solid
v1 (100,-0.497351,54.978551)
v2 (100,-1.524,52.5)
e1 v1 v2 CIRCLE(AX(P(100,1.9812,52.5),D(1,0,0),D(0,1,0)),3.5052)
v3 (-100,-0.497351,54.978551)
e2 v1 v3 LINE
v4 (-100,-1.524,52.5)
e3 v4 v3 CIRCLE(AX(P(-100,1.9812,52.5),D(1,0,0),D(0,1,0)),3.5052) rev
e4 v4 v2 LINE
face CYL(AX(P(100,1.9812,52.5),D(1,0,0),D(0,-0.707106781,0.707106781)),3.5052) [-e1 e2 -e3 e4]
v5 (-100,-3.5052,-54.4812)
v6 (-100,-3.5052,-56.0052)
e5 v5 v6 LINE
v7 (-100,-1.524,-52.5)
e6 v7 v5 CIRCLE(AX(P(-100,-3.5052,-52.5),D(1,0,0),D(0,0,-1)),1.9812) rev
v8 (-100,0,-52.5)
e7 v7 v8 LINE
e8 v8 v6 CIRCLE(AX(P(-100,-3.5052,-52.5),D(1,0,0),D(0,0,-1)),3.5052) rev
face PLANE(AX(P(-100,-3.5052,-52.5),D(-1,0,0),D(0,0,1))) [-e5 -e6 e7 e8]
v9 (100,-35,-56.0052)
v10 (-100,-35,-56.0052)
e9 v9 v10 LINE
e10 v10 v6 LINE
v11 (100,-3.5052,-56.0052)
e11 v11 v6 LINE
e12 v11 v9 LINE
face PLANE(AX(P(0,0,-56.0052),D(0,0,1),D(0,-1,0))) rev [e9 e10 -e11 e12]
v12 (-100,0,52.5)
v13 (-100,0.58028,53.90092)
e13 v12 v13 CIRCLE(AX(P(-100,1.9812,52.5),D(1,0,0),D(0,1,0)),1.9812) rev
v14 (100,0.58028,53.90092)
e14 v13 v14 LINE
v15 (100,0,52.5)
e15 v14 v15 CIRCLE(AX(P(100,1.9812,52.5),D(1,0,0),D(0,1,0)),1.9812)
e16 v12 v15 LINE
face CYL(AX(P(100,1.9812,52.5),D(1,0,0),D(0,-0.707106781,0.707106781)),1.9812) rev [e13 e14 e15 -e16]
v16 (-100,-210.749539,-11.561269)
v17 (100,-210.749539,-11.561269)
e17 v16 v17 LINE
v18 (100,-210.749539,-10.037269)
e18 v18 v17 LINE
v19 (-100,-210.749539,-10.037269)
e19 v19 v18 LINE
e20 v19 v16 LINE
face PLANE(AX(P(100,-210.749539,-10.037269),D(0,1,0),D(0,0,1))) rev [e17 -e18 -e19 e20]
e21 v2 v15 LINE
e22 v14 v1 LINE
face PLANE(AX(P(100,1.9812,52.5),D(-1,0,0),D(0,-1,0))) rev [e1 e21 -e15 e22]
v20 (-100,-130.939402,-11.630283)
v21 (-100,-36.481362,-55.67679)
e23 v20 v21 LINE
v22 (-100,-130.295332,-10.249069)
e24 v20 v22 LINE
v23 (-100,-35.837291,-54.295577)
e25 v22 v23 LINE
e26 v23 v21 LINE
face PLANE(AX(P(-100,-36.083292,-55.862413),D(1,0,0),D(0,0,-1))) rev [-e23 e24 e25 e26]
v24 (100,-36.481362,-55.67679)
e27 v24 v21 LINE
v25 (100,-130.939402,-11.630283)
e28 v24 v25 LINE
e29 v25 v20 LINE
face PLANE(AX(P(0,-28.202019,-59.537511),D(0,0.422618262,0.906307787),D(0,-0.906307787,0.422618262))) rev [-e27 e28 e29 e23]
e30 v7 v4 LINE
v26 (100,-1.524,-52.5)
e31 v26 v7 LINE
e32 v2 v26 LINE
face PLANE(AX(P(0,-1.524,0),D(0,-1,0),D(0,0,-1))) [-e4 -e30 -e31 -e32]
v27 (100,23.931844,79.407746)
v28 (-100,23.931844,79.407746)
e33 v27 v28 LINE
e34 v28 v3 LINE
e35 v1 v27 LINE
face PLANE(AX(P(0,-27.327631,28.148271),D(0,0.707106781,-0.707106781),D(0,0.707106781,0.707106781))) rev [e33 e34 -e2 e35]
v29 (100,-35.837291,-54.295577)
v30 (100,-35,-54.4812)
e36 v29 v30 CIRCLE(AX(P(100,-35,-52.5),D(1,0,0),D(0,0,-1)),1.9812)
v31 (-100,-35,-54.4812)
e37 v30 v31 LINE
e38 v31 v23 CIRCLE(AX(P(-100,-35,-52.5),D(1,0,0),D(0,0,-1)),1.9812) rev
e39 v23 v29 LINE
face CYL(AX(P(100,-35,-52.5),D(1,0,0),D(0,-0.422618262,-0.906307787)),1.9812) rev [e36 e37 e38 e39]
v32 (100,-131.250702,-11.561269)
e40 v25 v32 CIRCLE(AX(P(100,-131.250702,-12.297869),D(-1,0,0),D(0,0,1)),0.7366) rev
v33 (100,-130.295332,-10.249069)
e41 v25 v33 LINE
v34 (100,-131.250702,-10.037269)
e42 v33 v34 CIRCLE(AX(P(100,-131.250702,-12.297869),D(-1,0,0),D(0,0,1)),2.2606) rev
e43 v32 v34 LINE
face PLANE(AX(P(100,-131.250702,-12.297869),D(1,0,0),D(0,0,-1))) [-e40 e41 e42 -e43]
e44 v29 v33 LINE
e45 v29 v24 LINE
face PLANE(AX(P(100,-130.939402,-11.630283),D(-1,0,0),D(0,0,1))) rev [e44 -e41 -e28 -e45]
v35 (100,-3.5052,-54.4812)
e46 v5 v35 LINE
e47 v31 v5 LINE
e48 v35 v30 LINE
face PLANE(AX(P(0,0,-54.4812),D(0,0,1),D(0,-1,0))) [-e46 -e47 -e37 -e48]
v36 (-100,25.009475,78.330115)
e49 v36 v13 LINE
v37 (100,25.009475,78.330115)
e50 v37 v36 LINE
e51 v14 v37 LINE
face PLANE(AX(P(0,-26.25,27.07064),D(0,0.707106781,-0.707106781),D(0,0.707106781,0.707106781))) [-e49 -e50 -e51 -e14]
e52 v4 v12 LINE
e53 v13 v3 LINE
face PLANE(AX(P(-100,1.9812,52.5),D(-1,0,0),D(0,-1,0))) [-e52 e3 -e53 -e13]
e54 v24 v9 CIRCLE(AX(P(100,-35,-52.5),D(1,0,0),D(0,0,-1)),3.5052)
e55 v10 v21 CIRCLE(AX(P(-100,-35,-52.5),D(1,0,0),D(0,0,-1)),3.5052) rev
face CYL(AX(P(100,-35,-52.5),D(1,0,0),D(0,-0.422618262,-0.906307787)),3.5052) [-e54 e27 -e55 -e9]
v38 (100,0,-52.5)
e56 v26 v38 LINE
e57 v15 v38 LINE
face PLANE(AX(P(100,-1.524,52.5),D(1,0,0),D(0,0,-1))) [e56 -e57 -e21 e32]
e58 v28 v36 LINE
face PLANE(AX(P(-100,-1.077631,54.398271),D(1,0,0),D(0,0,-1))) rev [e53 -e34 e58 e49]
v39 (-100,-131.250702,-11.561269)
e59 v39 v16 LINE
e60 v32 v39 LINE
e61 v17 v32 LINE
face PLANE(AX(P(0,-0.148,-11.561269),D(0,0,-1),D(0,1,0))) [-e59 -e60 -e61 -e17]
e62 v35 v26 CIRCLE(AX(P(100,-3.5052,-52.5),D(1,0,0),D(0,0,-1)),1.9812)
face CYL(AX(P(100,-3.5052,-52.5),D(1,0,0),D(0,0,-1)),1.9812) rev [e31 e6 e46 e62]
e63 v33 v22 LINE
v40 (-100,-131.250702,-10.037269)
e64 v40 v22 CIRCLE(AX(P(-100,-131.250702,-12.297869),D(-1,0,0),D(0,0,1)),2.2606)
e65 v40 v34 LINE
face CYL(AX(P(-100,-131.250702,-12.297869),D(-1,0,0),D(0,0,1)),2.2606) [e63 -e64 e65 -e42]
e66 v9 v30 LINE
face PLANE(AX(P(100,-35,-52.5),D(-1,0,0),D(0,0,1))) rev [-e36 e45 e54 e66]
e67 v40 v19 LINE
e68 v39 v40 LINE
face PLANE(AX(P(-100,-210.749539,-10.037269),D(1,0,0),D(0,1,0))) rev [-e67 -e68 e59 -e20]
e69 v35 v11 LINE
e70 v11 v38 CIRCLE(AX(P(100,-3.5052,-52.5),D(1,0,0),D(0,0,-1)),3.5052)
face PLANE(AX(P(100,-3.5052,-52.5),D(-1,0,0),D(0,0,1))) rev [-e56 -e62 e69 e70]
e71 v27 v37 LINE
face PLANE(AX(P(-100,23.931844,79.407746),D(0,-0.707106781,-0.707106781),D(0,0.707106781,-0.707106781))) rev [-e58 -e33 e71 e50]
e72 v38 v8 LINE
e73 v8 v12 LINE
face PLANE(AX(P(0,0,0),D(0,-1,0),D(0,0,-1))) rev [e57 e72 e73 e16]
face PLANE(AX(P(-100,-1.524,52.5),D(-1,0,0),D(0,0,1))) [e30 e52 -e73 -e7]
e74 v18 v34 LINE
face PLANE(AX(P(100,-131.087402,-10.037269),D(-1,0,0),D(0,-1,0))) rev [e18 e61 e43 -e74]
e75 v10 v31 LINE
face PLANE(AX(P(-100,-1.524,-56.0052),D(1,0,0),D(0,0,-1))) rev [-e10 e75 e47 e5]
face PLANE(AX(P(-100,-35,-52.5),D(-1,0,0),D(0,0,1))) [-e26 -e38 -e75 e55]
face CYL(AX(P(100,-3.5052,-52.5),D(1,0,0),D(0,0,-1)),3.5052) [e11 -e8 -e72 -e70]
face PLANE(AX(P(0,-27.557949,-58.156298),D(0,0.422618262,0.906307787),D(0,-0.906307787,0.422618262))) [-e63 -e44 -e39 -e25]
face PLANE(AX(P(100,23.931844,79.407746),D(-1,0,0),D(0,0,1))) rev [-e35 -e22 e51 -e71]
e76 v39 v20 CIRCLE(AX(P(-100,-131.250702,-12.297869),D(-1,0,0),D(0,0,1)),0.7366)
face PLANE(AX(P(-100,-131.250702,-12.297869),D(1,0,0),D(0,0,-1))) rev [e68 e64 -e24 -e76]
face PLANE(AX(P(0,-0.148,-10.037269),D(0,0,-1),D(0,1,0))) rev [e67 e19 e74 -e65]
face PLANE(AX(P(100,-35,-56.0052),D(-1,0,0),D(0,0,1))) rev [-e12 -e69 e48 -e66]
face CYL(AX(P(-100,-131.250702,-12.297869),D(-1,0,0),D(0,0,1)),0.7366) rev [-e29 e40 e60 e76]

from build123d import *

# Parameters (mm, degrees)
SKETCH1_W          = 200
SKETCH1_H          = 105
BASE_FLANGE1_DEPTH = 1.524
EDGE_FLANGE1_DEPTH = 200
EDGE_FLANGE2_DEPTH = 200
EDGE_FLANGE3_DEPTH = 200
EDGE_FLANGE4_DEPTH = 200


# Sheet-metal steps are written as plain solids
with BuildPart() as part:
    # Sketch1 → Base-Flange1 (new body)
    with BuildSketch(Plane(origin=(0, 0, 0), x_dir=(1, 0, 0), z_dir=(0, 1, 0))):
        Rectangle(SKETCH1_W, SKETCH1_H)
    extrude(amount=-BASE_FLANGE1_DEPTH)

    # Edge-Flange1 section (across the edge) → Edge-Flange1 (add)
    with BuildSketch(Plane(origin=(-100, 0, 53.32063991), x_dir=(0, 0.7071067811865512, -0.7071067811865438), z_dir=(1, 0, 0))):
        with BuildLine():
            Line((-1.524, 0.82063991), (-1.524, 35.368738531))
            Line((-1.524, 35.368738531), (0, 35.368738531))
            Line((0, 35.368738531), (0, 0.82063991))
            ThreePointArc((0, 0.82063991), (0.15080987, 0.062467494), (0.580280045, -0.580280045))
            Line((0.580280045, -0.580280045), (-0.497350689, -1.65791078))
            ThreePointArc((-0.497350689, -1.65791078), (-1.257182537, -0.520742057), (-1.524, 0.82063991))
        make_face()
    extrude(amount=EDGE_FLANGE1_DEPTH)

    # Edge-Flange2 section (across the edge) → Edge-Flange2 (add)
    with BuildSketch(Plane(origin=(-100, -1.524, -54.4812), x_dir=(0, 0, 1), z_dir=(1, 0, 0))):
        with BuildLine():
            Line((-1.524, 1.9812), (-1.524, 33.476))
            Line((-1.524, 33.476), (0, 33.476))
            Line((0, 33.476), (0, 1.9812))
            ThreePointArc((0, 1.9812), (0.580280045, 0.580280045), (1.9812, 0))
            Line((1.9812, 0), (1.9812, -1.524))
            ThreePointArc((1.9812, -1.524), (-0.497350689, -0.497350689), (-1.524, 1.9812))
        make_face()
    extrude(amount=EDGE_FLANGE2_DEPTH)

    # Edge-Flange3 section (across the edge) → Edge-Flange3 (add)
    with BuildSketch(Plane(origin=(-100, -35.439221466, -54.4812), x_dir=(0, 0.4226182617406906, 0.906307787036654), z_dir=(1, 0, 0))):
        with BuildLine():
            Line((-1.524, 0.439221466), (-1.524, 104.662137334))
            Line((-1.524, 104.662137334), (0, 104.662137334))
            Line((0, 104.662137334), (0, 0.439221466))
            ThreePointArc((0, 0.439221466), (0.046962351, 0.010411302), (0.185623012, -0.398069835))
            Line((0.185623012, -0.398069835), (-1.195590055, -1.042140065))
            ThreePointArc((-1.195590055, -1.042140065), (-1.440912764, -0.319442669), (-1.524, 0.439221466))
        make_face()
    extrude(amount=EDGE_FLANGE3_DEPTH)

    # Edge-Flange4 section (across the edge) → Edge-Flange4 (add)
    with BuildSketch(Plane(origin=(100, -131.087402093, -11.561268833), x_dir=(0, 0, -1), z_dir=(-1, 0, 0))):
        with BuildLine():
            Line((-1.524, 0.163300289), (-1.524, 79.662137334))
            Line((-1.524, 79.662137334), (0, 79.662137334))
            Line((0, 79.662137334), (0, 0.163300289))
            ThreePointArc((0, 0.163300289), (0.017460361, 0.003870869), (0.069013684, -0.148000323))
            Line((0.069013684, -0.148000323), (-1.312199383, -0.792070554))
            ThreePointArc((-1.312199383, -0.792070554), (-1.470414754, -0.325983103), (-1.524, 0.163300289))
        make_face()
    extrude(amount=EDGE_FLANGE4_DEPTH)


solid = part.part
